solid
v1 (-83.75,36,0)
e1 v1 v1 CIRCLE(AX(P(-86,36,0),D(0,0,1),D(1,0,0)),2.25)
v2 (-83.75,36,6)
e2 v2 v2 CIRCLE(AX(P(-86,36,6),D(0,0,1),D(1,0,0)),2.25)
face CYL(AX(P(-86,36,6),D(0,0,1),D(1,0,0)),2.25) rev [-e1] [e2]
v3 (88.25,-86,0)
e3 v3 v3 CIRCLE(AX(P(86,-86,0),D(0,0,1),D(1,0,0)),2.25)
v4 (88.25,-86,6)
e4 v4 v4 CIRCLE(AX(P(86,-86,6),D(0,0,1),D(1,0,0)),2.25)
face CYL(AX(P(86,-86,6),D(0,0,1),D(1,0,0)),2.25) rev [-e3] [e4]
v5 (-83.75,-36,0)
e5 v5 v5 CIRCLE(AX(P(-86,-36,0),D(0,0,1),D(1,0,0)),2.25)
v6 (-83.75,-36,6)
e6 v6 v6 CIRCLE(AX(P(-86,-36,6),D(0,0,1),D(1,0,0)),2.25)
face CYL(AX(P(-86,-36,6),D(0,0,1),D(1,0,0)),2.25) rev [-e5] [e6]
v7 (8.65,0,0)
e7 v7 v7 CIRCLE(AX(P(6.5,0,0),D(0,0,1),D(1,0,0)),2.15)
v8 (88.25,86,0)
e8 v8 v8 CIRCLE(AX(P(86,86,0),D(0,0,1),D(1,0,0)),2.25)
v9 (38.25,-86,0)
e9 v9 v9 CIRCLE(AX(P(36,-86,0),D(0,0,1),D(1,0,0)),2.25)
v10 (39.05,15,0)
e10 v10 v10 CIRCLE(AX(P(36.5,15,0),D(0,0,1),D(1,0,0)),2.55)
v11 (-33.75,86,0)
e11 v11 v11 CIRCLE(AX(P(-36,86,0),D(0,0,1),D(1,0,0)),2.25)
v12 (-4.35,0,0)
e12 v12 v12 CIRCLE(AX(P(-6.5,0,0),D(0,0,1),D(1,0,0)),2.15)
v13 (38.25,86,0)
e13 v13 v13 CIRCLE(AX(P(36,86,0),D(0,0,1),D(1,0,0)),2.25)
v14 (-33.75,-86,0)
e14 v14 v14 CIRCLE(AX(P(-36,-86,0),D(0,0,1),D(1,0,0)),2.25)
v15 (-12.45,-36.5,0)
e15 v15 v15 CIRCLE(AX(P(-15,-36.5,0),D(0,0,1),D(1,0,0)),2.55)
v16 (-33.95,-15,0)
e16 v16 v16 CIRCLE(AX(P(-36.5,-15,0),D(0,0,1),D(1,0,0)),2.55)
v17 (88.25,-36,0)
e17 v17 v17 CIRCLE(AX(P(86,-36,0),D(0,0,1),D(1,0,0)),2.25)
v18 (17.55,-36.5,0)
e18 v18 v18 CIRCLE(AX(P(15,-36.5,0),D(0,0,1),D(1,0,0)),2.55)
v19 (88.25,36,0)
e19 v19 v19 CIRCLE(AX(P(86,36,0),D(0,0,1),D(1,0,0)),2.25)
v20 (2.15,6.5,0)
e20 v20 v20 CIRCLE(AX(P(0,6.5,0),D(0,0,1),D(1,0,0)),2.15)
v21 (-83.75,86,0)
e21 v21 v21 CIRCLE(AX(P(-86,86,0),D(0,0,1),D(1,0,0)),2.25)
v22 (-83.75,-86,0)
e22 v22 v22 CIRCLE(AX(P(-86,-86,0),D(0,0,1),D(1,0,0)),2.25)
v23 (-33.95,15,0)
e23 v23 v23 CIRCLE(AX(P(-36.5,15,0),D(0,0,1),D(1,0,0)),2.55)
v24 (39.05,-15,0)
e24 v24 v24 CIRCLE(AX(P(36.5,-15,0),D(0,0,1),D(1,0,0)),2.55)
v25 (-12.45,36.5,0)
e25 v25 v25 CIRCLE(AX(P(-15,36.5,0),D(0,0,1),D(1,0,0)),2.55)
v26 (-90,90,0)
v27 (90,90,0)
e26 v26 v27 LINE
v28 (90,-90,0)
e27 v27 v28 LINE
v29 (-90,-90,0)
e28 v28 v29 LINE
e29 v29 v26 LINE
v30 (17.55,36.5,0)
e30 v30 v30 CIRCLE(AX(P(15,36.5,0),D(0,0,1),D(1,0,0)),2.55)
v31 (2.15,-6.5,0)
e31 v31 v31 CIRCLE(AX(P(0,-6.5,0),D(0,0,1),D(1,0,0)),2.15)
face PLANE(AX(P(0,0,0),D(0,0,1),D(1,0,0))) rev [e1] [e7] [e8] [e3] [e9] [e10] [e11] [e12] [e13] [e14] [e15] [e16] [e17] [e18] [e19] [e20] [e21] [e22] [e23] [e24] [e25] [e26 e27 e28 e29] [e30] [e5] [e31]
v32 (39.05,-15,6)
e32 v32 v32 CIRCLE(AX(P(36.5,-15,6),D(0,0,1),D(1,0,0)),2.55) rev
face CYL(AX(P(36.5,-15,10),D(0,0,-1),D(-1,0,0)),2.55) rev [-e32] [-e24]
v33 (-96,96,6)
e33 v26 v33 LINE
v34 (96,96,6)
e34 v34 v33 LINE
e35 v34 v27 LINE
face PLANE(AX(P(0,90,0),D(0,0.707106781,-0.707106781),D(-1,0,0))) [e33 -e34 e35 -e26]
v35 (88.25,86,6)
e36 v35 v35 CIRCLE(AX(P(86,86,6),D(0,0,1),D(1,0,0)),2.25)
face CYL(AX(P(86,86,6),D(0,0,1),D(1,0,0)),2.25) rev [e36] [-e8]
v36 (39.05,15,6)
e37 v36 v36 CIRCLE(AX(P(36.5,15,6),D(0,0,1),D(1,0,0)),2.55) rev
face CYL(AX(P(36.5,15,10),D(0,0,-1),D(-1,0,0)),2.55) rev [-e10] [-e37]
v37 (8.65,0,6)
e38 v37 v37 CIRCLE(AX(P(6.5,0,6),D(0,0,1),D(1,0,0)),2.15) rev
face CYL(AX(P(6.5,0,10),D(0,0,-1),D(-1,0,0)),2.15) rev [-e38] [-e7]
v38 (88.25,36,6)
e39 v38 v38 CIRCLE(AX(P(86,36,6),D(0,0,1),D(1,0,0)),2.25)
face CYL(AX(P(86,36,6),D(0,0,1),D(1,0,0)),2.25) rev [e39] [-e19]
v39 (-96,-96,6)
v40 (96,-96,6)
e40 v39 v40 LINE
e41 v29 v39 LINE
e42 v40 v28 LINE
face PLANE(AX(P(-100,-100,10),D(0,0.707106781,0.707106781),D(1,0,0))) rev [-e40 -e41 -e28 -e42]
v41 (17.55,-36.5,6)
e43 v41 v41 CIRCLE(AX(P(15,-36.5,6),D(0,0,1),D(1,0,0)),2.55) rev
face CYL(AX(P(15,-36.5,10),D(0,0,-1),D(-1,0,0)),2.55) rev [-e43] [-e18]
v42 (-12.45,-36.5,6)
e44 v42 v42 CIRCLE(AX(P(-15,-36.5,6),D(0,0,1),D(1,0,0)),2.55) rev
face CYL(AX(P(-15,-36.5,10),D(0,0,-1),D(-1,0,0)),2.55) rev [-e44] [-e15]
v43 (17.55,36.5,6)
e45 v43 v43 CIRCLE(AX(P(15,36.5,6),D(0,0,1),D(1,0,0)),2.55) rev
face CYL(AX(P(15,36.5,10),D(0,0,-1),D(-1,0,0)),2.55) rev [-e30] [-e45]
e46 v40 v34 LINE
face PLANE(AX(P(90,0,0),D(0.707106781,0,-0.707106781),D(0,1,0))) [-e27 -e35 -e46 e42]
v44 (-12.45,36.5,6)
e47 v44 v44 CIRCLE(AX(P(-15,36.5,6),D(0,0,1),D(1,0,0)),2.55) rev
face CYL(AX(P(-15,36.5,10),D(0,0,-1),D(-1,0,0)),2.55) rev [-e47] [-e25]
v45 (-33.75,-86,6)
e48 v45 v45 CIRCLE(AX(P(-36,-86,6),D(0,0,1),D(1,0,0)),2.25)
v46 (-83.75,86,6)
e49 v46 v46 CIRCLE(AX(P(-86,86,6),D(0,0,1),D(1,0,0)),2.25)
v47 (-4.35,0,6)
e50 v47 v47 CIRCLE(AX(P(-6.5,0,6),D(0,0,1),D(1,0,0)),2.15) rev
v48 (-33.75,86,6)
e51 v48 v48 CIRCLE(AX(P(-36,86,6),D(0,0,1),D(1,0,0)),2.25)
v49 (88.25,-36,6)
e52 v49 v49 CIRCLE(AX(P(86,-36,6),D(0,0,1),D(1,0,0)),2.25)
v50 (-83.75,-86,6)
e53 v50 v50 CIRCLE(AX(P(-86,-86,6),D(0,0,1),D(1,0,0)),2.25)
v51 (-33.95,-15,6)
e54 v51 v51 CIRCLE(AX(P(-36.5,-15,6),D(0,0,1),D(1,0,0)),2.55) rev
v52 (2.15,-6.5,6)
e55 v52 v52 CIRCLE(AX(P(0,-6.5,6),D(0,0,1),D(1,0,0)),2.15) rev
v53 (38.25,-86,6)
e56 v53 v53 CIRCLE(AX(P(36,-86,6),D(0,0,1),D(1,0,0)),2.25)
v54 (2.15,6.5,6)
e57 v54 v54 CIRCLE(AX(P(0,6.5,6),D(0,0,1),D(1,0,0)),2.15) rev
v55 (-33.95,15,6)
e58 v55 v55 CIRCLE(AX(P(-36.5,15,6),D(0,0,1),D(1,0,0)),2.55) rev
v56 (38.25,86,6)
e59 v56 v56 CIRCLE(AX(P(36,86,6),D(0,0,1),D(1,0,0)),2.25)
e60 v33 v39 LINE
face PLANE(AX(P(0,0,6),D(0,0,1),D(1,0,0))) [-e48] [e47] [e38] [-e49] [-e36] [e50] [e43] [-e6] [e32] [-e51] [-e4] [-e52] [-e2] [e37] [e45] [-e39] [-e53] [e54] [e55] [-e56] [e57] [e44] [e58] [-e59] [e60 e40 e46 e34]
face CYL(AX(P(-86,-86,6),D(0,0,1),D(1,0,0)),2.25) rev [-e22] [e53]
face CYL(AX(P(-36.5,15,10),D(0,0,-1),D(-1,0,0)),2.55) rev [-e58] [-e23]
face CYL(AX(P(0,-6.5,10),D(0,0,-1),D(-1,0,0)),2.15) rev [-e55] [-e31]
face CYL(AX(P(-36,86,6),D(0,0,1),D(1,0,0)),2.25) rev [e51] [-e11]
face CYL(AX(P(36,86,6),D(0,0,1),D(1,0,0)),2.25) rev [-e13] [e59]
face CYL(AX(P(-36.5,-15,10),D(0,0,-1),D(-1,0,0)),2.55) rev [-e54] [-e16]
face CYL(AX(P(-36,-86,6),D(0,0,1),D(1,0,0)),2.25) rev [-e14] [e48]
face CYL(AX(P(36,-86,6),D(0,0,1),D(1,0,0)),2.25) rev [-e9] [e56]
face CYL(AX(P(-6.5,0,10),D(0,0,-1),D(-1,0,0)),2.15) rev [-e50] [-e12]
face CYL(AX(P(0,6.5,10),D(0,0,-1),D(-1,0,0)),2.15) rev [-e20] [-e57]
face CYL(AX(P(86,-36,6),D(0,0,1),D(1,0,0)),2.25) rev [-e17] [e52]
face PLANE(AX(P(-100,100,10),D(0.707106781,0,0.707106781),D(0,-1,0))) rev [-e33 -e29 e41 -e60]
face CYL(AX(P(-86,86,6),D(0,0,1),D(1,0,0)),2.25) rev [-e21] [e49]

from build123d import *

# Parameters (mm, degrees)
SKETCH_1_W             = 200
SKETCH_1_H             = 200
EXTRUDE_1_DEPTH        = 3
SKETCH_5_W             = 200
SKETCH_5_H             = 200
EXTRUDE_2_DEPTH        = 3
SKETCH_2_R             = 2.55
SKETCH_2_R_2           = 2.15
CUT_EXTRUDE_1_DEPTH    = 10
CHAMFER_1_SIZE         = 10
HOLE_WIZARD_M4_1_D     = 4.5
HOLE_WIZARD_M4_1_DEPTH = 6
HOLE_WIZARD_M4_1_TIP   = 1.351936393


with BuildPart() as part:
    # 스케치1 → 보스-돌출1 (new body)
    with BuildSketch(Plane.XY):
        Rectangle(SKETCH_1_W, SKETCH_1_H)
    extrude(amount=EXTRUDE_1_DEPTH)

    # 스케치5 → 보스-돌출2 (add)
    with BuildSketch(Plane.XY.offset(3)):
        Rectangle(SKETCH_5_W, SKETCH_5_H)
    extrude(amount=EXTRUDE_2_DEPTH)

    # 스케치2 → 컷-돌출1 (cut)
    with BuildSketch(Plane.XY):
        with Locations((-36.5, 15)):
            Circle(SKETCH_2_R)
        with Locations((-36.5, -15)):
            Circle(SKETCH_2_R)
        with Locations((-6.5, 0)):
            Circle(SKETCH_2_R_2)
        with Locations((15, 36.5)):
            Circle(SKETCH_2_R)
        with Locations((-15, 36.5)):
            Circle(SKETCH_2_R)
        with Locations((0, 6.5)):
            Circle(SKETCH_2_R_2)
        with Locations((36.5, -15)):
            Circle(SKETCH_2_R)
        with Locations((36.5, 15)):
            Circle(SKETCH_2_R)
        with Locations((6.5, 0)):
            Circle(SKETCH_2_R_2)
        with Locations((-15, -36.5)):
            Circle(SKETCH_2_R)
        with Locations((15, -36.5)):
            Circle(SKETCH_2_R)
        with Locations((0, -6.5)):
            Circle(SKETCH_2_R_2)
    extrude(amount=CUT_EXTRUDE_1_DEPTH, mode=Mode.SUBTRACT)

    # 모따기1
    # the kernel refuses this chamfer: 10 mm, written as the material it takes off along each edge
    with BuildSketch(Plane(origin=(-125.71682988, 100, 0), x_dir=(0, 0.027495876610586317, 0.9996219169112968), z_dir=(1, 0, 0)), Plane(origin=(-100, -125.71682988, 0), x_dir=(-0.027495876610586317, 0, 0.9996219169112968), z_dir=(0, 1, 0)), Plane(origin=(100, 125.71682988, 0), x_dir=(0.027495876610586317, 0, 0.9996219169112968), z_dir=(0, -1, 0))) as chamfer_1_piece_1:
        Polygon((CHAMFER_1_SIZE * 0.999621916911, CHAMFER_1_SIZE * 0.0274958766106), (-CHAMFER_1_SIZE * 0.0274958766106, CHAMFER_1_SIZE * 0.999621916911), (0, 0), align=None)
    extrude(amount=251.433659759, mode=Mode.SUBTRACT)
    with BuildSketch(Plane(origin=(125.71682988, -100, 0), x_dir=(0, 0.9996219169112968, -0.027495876610586372), z_dir=(-1, 0, 0))) as chamfer_1_piece_2:
        Polygon((CHAMFER_1_SIZE * 0.999621916911, -CHAMFER_1_SIZE * 0.0274958766106), (-CHAMFER_1_SIZE * 0.0274958766106, -CHAMFER_1_SIZE * 0.999621916911), (0, 0), align=None)
    extrude(amount=251.433659759, mode=Mode.SUBTRACT)

    # M4 여유 구멍1
    with Locations(Plane.XY.offset(6)):
        with Locations((-86, -86), (-86, 86), (86, 86), (86, -86), (-86, -36), (-36, -86), (36, -86), (86, -36), (86, 36), (-36, 86), (36, 86), (-86, 36)):
            Hole(HOLE_WIZARD_M4_1_D / 2, depth=HOLE_WIZARD_M4_1_DEPTH)
            with Locations((0, 0, -(HOLE_WIZARD_M4_1_DEPTH + HOLE_WIZARD_M4_1_TIP / 2))):  # 118° drill point
                Cone(0, HOLE_WIZARD_M4_1_D / 2, HOLE_WIZARD_M4_1_TIP, mode=Mode.SUBTRACT)


solid = part.part
